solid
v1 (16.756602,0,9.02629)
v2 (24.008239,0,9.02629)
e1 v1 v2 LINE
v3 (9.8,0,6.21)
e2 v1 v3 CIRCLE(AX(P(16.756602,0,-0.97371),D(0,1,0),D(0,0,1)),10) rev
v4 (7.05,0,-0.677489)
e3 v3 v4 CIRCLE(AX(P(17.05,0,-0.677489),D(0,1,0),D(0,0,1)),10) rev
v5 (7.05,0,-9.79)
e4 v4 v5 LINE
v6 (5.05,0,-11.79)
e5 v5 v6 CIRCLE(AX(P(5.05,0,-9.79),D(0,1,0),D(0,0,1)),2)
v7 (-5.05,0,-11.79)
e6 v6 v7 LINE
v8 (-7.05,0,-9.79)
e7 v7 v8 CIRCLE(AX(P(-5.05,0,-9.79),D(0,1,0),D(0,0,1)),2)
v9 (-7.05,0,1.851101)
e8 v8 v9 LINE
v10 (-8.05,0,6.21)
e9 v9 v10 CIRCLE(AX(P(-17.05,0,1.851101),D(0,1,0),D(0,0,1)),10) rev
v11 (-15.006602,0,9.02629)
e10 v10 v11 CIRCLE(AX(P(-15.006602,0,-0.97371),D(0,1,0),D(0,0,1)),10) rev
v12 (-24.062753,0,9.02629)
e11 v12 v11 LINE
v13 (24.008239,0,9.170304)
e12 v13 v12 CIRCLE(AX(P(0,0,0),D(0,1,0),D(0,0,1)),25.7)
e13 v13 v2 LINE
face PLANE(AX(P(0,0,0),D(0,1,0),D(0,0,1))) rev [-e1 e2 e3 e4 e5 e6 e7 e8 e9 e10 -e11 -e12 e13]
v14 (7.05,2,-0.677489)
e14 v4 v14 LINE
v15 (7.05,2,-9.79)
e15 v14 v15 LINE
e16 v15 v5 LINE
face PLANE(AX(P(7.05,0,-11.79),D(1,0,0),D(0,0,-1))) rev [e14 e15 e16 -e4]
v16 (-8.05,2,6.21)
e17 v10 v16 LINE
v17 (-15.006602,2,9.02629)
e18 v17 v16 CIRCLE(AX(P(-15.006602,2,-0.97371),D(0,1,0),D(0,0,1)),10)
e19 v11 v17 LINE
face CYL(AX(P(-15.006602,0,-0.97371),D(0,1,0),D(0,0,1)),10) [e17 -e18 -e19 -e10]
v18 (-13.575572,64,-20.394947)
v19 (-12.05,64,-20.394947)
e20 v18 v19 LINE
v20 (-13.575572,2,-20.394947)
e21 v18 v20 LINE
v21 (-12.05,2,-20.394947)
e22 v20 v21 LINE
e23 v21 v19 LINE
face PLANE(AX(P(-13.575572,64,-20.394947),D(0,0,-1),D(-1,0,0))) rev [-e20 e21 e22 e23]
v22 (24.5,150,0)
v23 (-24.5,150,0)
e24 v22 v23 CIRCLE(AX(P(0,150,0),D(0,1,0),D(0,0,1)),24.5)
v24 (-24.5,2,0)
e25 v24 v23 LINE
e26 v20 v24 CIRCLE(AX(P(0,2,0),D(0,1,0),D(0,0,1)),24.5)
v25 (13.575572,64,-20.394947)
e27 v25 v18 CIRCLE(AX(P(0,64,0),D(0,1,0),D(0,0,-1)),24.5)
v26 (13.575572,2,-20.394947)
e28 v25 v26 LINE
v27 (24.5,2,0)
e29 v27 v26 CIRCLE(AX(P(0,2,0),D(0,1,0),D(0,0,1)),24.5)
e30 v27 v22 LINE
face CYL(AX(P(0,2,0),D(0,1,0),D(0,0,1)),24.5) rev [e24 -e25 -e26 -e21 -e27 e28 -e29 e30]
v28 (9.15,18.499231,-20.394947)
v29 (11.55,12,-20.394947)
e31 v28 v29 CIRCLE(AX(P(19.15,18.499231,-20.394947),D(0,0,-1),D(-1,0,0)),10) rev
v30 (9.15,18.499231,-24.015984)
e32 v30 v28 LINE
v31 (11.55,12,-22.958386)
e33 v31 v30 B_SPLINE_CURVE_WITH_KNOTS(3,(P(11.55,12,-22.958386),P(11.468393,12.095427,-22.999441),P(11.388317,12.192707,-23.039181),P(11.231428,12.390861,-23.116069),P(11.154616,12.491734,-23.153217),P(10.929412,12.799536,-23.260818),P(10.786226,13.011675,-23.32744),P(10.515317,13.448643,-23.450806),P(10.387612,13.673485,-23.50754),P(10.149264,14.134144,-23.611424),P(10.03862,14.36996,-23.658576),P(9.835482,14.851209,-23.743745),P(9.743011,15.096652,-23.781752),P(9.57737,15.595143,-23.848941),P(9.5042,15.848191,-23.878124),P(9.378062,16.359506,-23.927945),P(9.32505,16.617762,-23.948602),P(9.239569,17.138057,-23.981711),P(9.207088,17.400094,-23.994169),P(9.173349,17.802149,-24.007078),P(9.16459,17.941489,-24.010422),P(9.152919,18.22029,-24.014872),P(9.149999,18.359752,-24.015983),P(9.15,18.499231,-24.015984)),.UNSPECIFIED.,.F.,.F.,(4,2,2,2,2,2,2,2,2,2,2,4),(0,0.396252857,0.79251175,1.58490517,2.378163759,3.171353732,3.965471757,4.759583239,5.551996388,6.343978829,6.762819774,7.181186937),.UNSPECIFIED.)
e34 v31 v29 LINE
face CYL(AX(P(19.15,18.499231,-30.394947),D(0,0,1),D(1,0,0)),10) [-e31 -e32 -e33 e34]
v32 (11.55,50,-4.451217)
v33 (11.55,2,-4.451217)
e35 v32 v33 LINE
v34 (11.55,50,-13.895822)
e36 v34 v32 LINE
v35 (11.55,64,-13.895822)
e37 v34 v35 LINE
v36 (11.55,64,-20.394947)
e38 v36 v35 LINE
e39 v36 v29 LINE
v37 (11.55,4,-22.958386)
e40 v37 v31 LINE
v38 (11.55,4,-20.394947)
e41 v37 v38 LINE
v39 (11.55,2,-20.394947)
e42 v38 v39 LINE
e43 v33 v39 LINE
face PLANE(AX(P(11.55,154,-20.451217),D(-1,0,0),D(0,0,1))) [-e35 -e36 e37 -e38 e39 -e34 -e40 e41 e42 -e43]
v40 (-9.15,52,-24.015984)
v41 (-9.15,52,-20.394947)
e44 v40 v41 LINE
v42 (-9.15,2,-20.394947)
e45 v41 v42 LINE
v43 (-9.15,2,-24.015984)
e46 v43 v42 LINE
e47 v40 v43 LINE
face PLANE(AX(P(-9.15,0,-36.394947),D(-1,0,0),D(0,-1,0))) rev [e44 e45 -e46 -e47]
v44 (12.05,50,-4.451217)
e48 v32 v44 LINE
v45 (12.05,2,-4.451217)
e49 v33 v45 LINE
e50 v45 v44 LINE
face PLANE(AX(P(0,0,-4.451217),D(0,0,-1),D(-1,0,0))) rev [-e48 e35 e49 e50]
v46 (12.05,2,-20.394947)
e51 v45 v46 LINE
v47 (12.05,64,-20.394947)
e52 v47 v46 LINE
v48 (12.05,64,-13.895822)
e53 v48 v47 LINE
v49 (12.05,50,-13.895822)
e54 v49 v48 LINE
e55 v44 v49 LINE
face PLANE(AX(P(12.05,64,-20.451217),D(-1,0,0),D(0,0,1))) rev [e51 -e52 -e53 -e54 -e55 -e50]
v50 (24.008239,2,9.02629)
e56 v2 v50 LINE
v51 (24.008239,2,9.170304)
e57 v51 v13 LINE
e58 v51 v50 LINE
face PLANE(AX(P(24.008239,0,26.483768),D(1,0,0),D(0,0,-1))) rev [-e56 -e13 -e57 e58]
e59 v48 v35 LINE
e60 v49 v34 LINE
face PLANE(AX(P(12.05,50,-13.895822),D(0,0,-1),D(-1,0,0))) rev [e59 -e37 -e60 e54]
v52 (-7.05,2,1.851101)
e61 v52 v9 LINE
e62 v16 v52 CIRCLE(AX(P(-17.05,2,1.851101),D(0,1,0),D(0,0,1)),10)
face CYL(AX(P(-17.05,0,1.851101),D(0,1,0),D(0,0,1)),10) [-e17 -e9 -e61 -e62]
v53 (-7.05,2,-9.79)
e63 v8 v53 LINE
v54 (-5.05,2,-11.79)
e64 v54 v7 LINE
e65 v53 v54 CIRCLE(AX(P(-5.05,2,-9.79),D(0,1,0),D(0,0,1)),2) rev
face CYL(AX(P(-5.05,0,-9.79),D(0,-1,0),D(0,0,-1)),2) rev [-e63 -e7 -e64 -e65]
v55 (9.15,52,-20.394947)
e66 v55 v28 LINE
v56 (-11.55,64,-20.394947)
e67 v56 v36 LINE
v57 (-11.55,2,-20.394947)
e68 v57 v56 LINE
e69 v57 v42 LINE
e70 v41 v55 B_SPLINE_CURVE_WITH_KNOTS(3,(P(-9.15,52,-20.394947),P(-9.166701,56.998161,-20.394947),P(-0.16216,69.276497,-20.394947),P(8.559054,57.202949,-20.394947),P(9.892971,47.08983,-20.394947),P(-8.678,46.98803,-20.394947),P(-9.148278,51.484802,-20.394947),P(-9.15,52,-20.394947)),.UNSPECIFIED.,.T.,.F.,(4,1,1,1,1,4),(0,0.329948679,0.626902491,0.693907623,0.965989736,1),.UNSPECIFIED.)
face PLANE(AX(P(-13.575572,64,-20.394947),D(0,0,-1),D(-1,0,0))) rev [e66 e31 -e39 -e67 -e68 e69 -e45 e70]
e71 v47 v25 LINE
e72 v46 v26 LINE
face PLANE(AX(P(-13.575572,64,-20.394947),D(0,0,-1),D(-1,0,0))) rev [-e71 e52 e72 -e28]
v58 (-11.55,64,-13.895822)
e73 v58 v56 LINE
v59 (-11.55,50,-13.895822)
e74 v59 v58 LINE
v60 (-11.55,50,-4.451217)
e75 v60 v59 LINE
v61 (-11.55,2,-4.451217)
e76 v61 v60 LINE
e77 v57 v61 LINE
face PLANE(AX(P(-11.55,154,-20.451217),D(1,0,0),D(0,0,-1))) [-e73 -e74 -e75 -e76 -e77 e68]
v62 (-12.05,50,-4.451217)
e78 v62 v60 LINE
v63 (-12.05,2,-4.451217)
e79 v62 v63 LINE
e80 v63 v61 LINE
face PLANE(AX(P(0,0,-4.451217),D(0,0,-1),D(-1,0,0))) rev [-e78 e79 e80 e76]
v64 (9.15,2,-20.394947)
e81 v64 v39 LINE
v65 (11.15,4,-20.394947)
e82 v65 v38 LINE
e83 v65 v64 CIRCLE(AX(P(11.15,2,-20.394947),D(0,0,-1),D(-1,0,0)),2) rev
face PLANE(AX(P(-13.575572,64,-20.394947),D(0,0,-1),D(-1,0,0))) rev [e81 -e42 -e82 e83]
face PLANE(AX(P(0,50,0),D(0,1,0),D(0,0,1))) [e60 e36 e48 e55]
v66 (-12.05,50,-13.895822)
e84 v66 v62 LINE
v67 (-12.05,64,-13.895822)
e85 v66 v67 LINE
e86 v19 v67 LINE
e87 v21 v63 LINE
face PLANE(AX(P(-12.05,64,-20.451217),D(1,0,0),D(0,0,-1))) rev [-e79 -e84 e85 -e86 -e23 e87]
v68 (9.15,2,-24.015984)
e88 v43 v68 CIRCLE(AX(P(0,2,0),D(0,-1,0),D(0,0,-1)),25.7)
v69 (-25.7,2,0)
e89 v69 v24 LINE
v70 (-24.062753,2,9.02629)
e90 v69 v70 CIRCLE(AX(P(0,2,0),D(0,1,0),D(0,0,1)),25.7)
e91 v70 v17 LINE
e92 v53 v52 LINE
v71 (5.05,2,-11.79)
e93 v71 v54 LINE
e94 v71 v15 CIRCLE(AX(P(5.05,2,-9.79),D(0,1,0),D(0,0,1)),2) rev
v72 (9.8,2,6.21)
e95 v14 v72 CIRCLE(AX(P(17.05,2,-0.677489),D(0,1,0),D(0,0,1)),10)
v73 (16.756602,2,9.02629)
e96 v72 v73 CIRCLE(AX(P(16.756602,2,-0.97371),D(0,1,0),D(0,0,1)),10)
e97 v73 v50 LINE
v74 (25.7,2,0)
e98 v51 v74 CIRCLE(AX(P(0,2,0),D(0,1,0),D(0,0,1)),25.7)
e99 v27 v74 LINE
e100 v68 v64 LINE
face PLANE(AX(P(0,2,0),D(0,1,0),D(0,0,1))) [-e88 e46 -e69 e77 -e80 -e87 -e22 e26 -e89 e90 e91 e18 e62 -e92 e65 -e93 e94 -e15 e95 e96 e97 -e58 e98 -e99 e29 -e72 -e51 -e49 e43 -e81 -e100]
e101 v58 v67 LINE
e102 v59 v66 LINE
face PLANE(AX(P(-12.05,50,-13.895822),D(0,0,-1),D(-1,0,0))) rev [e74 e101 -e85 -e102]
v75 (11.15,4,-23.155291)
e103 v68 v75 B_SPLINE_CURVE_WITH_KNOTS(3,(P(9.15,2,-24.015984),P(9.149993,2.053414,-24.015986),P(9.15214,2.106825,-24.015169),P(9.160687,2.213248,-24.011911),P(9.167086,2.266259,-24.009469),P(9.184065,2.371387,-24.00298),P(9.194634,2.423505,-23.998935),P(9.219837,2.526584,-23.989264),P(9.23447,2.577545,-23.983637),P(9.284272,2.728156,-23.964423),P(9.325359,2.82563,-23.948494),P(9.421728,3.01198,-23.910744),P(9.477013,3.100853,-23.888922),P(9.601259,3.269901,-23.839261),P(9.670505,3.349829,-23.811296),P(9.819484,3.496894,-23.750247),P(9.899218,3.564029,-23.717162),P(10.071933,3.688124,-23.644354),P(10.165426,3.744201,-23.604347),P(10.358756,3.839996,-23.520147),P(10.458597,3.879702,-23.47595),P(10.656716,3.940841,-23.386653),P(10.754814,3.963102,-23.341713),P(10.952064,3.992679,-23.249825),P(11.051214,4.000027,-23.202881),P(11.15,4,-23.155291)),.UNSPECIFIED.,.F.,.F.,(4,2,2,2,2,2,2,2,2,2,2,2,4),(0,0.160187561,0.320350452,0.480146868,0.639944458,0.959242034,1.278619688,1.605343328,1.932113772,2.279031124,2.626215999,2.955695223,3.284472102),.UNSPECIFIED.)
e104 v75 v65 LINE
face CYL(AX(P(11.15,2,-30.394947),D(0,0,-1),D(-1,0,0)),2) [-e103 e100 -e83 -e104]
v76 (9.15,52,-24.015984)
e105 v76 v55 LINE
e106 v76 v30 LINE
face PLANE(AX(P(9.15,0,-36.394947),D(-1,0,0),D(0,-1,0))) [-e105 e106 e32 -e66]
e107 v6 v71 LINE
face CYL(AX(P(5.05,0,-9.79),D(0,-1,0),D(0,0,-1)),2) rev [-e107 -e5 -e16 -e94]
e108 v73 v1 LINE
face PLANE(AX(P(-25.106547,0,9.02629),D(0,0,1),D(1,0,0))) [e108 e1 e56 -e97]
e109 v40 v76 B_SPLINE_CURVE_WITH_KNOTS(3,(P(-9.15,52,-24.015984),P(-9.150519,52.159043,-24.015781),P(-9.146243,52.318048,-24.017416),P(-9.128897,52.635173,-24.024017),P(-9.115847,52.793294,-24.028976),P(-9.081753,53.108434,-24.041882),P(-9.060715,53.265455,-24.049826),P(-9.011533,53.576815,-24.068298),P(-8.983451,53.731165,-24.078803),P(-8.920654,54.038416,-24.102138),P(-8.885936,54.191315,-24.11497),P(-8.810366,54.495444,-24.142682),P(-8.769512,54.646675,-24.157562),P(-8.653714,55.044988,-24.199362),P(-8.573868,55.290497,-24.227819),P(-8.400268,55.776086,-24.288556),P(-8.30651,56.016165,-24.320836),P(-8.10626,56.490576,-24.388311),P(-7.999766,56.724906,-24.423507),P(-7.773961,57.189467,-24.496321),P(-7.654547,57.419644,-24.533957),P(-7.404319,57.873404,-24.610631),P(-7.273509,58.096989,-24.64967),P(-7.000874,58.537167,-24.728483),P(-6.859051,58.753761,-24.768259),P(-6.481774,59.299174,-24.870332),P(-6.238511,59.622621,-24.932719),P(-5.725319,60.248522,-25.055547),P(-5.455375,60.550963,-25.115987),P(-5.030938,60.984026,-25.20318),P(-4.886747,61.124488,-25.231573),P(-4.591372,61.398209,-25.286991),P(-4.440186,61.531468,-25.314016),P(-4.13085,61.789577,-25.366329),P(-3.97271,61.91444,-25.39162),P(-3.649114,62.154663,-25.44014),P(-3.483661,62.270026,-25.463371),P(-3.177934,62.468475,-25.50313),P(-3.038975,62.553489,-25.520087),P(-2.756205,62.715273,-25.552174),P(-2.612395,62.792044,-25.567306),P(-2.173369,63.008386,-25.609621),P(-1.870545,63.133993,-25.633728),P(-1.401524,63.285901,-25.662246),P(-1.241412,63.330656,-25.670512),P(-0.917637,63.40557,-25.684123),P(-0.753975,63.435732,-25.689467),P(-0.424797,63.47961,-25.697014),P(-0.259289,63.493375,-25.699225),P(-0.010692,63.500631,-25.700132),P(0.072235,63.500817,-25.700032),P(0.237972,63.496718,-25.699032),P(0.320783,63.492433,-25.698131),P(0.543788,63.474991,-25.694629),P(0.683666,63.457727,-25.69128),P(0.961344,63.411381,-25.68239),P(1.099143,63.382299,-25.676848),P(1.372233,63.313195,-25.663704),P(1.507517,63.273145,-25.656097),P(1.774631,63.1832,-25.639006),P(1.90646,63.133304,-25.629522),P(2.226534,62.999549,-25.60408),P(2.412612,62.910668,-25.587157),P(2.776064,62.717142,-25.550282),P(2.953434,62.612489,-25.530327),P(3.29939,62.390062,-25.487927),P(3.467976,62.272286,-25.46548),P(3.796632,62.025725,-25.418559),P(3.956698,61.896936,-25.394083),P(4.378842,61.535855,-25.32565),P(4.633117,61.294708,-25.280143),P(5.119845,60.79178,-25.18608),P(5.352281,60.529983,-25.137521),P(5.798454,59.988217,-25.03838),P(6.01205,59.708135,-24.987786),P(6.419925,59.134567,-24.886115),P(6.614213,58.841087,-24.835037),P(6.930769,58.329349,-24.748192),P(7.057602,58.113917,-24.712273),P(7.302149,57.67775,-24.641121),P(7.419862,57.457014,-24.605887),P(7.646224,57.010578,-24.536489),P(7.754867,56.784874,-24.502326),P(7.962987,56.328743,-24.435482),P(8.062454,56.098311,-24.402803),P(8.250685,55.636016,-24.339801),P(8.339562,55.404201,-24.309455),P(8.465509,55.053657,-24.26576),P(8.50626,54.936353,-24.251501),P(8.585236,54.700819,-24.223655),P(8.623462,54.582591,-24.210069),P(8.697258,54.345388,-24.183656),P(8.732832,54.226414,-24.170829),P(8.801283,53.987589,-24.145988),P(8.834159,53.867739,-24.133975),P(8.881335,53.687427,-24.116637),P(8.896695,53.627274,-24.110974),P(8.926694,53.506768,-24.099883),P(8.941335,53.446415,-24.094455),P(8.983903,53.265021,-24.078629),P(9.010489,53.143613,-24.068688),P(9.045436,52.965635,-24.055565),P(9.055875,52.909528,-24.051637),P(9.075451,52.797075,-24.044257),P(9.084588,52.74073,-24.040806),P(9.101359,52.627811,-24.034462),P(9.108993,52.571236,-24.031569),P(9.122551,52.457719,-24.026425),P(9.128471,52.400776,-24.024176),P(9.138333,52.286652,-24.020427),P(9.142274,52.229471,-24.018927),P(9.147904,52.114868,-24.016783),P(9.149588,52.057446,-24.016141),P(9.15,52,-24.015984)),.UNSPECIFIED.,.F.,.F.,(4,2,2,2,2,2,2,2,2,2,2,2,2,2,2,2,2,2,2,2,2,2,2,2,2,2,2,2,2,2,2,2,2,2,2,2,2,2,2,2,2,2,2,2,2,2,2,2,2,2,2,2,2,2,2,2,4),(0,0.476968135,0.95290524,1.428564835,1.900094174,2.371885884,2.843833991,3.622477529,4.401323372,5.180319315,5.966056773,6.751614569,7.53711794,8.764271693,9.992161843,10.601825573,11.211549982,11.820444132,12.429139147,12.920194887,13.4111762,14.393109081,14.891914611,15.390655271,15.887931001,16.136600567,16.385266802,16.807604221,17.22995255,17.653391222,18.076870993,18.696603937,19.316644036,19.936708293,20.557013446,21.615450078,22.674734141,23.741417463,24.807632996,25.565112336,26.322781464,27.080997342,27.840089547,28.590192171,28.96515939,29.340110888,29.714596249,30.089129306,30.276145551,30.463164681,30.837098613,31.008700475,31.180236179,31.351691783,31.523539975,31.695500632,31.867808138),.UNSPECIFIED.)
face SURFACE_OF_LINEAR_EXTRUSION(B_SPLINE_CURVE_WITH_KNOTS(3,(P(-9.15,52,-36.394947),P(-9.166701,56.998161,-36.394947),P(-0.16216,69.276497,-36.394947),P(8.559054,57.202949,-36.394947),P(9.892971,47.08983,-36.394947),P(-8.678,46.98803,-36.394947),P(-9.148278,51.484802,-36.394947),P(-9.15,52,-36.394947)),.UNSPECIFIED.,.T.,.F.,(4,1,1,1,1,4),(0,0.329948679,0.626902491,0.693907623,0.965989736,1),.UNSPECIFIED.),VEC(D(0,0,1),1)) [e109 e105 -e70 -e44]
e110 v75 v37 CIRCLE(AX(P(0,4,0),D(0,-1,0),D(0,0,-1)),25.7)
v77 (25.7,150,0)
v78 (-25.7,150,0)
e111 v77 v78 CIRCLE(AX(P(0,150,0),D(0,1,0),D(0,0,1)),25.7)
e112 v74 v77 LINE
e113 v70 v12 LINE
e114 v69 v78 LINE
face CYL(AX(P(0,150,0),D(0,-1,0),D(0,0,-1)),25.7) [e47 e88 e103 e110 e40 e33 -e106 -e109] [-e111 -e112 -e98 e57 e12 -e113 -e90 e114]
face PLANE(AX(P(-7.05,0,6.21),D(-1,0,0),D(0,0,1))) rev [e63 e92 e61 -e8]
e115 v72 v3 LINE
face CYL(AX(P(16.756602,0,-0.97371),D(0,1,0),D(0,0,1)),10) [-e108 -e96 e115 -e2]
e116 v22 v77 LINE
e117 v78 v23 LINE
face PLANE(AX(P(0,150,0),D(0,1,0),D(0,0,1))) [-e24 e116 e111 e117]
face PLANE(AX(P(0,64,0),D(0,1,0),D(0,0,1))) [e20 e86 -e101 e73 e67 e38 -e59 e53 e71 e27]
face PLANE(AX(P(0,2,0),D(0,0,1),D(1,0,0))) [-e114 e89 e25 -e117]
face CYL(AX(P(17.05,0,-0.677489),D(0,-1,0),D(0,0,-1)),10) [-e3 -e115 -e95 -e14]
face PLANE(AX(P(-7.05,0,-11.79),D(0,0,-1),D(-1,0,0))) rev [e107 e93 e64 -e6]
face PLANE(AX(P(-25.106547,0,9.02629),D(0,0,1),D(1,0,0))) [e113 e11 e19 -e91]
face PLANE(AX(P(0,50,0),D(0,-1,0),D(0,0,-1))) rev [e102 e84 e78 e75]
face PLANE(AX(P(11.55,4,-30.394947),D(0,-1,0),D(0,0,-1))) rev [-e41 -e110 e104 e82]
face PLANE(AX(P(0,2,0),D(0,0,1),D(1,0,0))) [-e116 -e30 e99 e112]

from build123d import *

# Parameters (mm, degrees)
SKETCH1_R               = 25.7
MAIN_CYLINDER_DEPTH     = 150
SKETCH4_R               = 24.5
MAIN_CUT_DOWN_DEPTH     = 148
SKETCH7_W               = 24.1
SKETCH7_H               = 31
FEATHER_BOX_DEPTH       = 62
FEATHER_HOLE_DEPTH      = 90
FEATHER_HOLE_DEPTH_BACK = 62
SKETCH8_W               = 23.1
SKETCH8_H               = 32
WINDOW_START            = 62
WINDOW_FILLER_DEPTH     = 62
SKETCH18_W              = 18.3
SKETCH18_H              = 50
WINDOW_CUT_DEPTH        = 16
SD_RESET_ACCESS_DEPTH   = 2
SKETCH26_W              = 0.5
SKETCH26_H              = 62
TRIM_DEPTH              = 15
FILLET3_R               = 10
SKETCH34_W              = 49.114786026
SKETCH34_H              = 17.457477886
CUT_EXTRUDE5_DEPTH      = 2
FILLET7_R               = 10
FILLET8_R               = 10
FILLET9_R               = 2
SKETCH28_W              = 2.4
SKETCH28_H              = 8
CUT_EXTRUDE6_DEPTH      = 10
FILLET10_R              = 10
FILLET11_R              = 2
SKETCH35_W              = 0.5
SKETCH35_H              = 9.444605522
CUT_EXTRUDE7_DEPTH      = 14


# Some blends are built 0.0001 mm under size
with BuildPart() as part:
    # Sketch1 → Main Cylinder (new body)
    with BuildSketch(Plane(origin=(0, 0, 0), x_dir=(1, 0, 0), z_dir=(0, 1, 0))):
        with Locations(Location((0, 0, 0), (0, 0, 270))):
            Circle(SKETCH1_R)
    extrude(amount=MAIN_CYLINDER_DEPTH)

    # Sketch4 → Main cut down (cut)
    with BuildSketch(Plane(origin=(0, 150, 0), x_dir=(1, 0, 0), z_dir=(0, 1, 0))):
        Circle(SKETCH4_R)
        Polygon((0, 0), (25.7, 0), (25.7, -40.6), (-25.7, -40.6), (-25.7, 0), align=None)
    extrude(amount=-MAIN_CUT_DOWN_DEPTH, mode=Mode.SUBTRACT)

    # Sketch7 → Feather box (add)
    with BuildSketch(Plane(origin=(0, 2, 0), x_dir=(1, 0, 0), z_dir=(0, 1, 0))):
        with Locations((0, 4.951216806)):
            Rectangle(SKETCH7_W, SKETCH7_H)
    extrude(amount=FEATHER_BOX_DEPTH)

    # Sketch8 → Feather hole (cut, two sides: drawn at the far end of the back side and taken through both)
    with BuildSketch(Plane(origin=(0, 64, 0), x_dir=(1, 0, 0), z_dir=(0, 1, 0)).offset(-FEATHER_HOLE_DEPTH_BACK)):
        with Locations((0, 4.451216806)):
            Rectangle(SKETCH8_W, SKETCH8_H)
    extrude(amount=FEATHER_HOLE_DEPTH + FEATHER_HOLE_DEPTH_BACK, mode=Mode.SUBTRACT)

    # Sketch15 → window filler (add)
    with BuildSketch(Plane(origin=(0, 2, 0), x_dir=(1, 0, 0), z_dir=(0, 1, 0)).offset(WINDOW_START)):
        with BuildLine():
            Line((-13.575571615, 20.394946809), (13.575571615, 20.394946809))
            ThreePointArc((13.575571615, 20.394946809), (0, 24.5), (-13.575571615, 20.394946809))
        make_face()
    extrude(amount=-WINDOW_FILLER_DEPTH)

    # Sketch18 → window cut (cut)
    with BuildSketch(Plane.XY.offset(-20.394946809)):
        with BuildLine():
            add(Edge.make_bspline(
                [(-9.15, 52), (-9.166701282, 56.998161016), (-0.16215998, 69.276496907), (8.559054188, 57.202948769), (9.892970994, 47.089830129), (-8.678000401, 46.988029764), (-9.148278475, 51.484802374), (-9.15, 52)],
                knots=[0, 0, 0, 0, 0.329948679, 0.626902491, 0.693907623, 0.965989736, 1, 1, 1, 1], degree=3))
        make_face()
        with Locations((0, 27)):
            Rectangle(SKETCH18_W, SKETCH18_H)
    extrude(amount=-WINDOW_CUT_DEPTH, mode=Mode.SUBTRACT)

    # Sketch23 → sd reset access (cut)
    with BuildSketch(Plane(origin=(0, 2, 0), x_dir=(1, 0, 0), z_dir=(0, 1, 0))):
        Polygon((-8.05, -11.21), (9.8, -11.21), (9.8, -6.21), (7.05, -6.21), (7.05, 11.79), (-7.05, 11.79), (-7.05, -6.21), (-8.05, -6.21), align=None)
    extrude(amount=-SD_RESET_ACCESS_DEPTH, mode=Mode.SUBTRACT)

    # Sketch26 → trim (cut)
    with BuildSketch(Plane.XY.offset(10.548783194)):
        with Locations((-11.8, 33)):
            Rectangle(SKETCH26_W, SKETCH26_H)
        with Locations((11.8, 33)):
            Rectangle(SKETCH26_W, SKETCH26_H)
    extrude(amount=-TRIM_DEPTH, mode=Mode.SUBTRACT)

    # Fillet3
    # the kernel refuses this fillet: 10 mm, written as the material it takes off along each edge
    with BuildSketch(Plane(origin=(-7.05, 12.897247359, 6.21), x_dir=(0, 0, -1), z_dir=(0, -1, 0))) as fillet3_piece_1:
        with BuildLine():
            CenterArc((4.358898944, -10), FILLET3_R, 90, 25.841932763)
            Line((0, -1), (-0.087177979, -0.82))
            ThreePointArc((-0.087177979, -0.82), (-0.2, -0.5), (-0.2, 0))
            Line((-0.2, 0), (0, 0.2))
            Line((0, 0.2), (4.358898944, 0.2))
            Line((4.358898944, 0.2), (4.358898944, 0))
        make_face()
    extrude(amount=23.794494718, mode=Mode.SUBTRACT)

    # Sketch34 → Cut-Extrude5 (cut)
    with BuildSketch(Plane(origin=(0, 2, 0), x_dir=(1, 0, 0), z_dir=(0, 1, 0))):
        with Locations((-0.549154382, -17.755029201)):
            Rectangle(SKETCH34_W, SKETCH34_H)
    extrude(amount=-CUT_EXTRUDE5_DEPTH, mode=Mode.SUBTRACT)

    # Fillet7
    # the kernel refuses this fillet: 10 mm, written as the material it takes off along each edge
    with BuildSketch(Plane(origin=(-8.05, 19.391505532, 9.026290258), x_dir=(-1, 0, 0), z_dir=(0, -1, 0))) as fillet7_piece_1:
        with BuildLine():
            CenterArc((6.956602213, 10), FILLET7_R, 225.920148316, 44.079851684)
            Line((0, 2.816290258), (-0.139132044, 2.672616063))
            ThreePointArc((-0.139132044, 2.672616063), (-0.2, 1.408145129), (-0.2, 0))
            Line((-0.2, 0), (0, -0.2))
            Line((0, -0.2), (6.956602213, -0.2))
            Line((6.956602213, -0.2), (6.956602213, 0))
        make_face()
    extrude(amount=36.783011063, mode=Mode.SUBTRACT)

    # Fillet8
    # the kernel refuses this fillet: 10 mm, written as the material it takes off along each edge
    with BuildSketch(Plane(origin=(9.8, -17.391505532, 9.026290258), x_dir=(1, 0, 0), z_dir=(0, 1, 0))) as fillet8_piece_1:
        with BuildLine():
            CenterArc((6.956602213, 10), FILLET8_R, 225.920148316, 44.079851684)
            Line((0, 2.816290258), (-0.139132044, 2.672616063))
            ThreePointArc((-0.139132044, 2.672616063), (-0.2, 1.408145129), (-0.2, 0))
            Line((-0.2, 0), (0, -0.2))
            Line((0, -0.2), (6.956602213, -0.2))
            Line((6.956602213, -0.2), (6.956602213, 0))
        make_face()
    extrude(amount=36.783011063, mode=Mode.SUBTRACT)
    with BuildSketch(Plane(origin=(7.05, 19.218721642, 6.21), x_dir=(1, 0, 0), z_dir=(0, -1, 0))) as fillet8_piece_2:
        with BuildLine():
            CenterArc((10, -6.887488657), FILLET8_R, 136.468847833, 43.531152167)
            Line((0, -6.887488657), (-0.2, -6.887488657))
            Line((-0.2, -6.887488657), (-0.2, 0))
            Line((-0.2, 0), (0, 0.2))
            ThreePointArc((0, 0.2), (1.375, 0.2), (2.605, 0.137749773))
            Line((2.605, 0.137749773), (2.75, 0))
        make_face()
    extrude(amount=36.437443285, mode=Mode.SUBTRACT)

    # Fillet9
    fillet9_edges = [part.edges().sort_by_distance(p)[0] for p in [
        (-7.05, 1, -11.79),
        (7.05, 1, -11.79),
    ]]
    fillet(fillet9_edges, radius=FILLET9_R)

    # Sketch28 → Cut-Extrude6 (cut)
    with BuildSketch(Plane.XY.offset(-20.394946809)):
        with Locations((10.35, 8)):
            Rectangle(SKETCH28_W, SKETCH28_H)
    extrude(amount=-CUT_EXTRUDE6_DEPTH, mode=Mode.SUBTRACT)

    # Fillet10
    # the kernel refuses this fillet: 10 mm, written as the material it takes off along each edge
    with BuildSketch(Plane(origin=(9.15, 12, -4.146869999), x_dir=(1, 0, 0), z_dir=(0, 0, -1))) as fillet10_piece_1:
        with BuildLine():
            CenterArc((10, -6.499230724), FILLET10_R, 139.464197889, 40.535802111)
            Line((0, -6.499230724), (-0.2, -6.499230724))
            Line((-0.2, -6.499230724), (-0.2, 0))
            Line((-0.2, 0), (0, 0.2))
            ThreePointArc((0, 0.2), (1.2, 0.2), (2.248, 0.129984614))
            Line((2.248, 0.129984614), (2.4, 0))
        make_face()
    extrude(amount=36.117191071, mode=Mode.SUBTRACT)

    # Fillet11
    fillet11_edges = [part.edges().sort_by_distance(p)[0] for p in [
        (9.15, 4, -22.205465534),
    ]]
    fillet(fillet11_edges, radius=FILLET11_R - 0.0001)  # a hair under: the kernel refuses the full size

    # Sketch35 → Cut-Extrude7 (cut)
    with BuildSketch(Plane(origin=(0, 64, 0), x_dir=(1, 0, 0), z_dir=(0, 1, 0))):
        with Locations((-11.8, 9.173519567)):
            Rectangle(SKETCH35_W, SKETCH35_H)
        with Locations((11.8, 9.173519567)):
            Rectangle(SKETCH35_W, SKETCH35_H)
    extrude(amount=-CUT_EXTRUDE7_DEPTH, mode=Mode.SUBTRACT)


solid = part.part
